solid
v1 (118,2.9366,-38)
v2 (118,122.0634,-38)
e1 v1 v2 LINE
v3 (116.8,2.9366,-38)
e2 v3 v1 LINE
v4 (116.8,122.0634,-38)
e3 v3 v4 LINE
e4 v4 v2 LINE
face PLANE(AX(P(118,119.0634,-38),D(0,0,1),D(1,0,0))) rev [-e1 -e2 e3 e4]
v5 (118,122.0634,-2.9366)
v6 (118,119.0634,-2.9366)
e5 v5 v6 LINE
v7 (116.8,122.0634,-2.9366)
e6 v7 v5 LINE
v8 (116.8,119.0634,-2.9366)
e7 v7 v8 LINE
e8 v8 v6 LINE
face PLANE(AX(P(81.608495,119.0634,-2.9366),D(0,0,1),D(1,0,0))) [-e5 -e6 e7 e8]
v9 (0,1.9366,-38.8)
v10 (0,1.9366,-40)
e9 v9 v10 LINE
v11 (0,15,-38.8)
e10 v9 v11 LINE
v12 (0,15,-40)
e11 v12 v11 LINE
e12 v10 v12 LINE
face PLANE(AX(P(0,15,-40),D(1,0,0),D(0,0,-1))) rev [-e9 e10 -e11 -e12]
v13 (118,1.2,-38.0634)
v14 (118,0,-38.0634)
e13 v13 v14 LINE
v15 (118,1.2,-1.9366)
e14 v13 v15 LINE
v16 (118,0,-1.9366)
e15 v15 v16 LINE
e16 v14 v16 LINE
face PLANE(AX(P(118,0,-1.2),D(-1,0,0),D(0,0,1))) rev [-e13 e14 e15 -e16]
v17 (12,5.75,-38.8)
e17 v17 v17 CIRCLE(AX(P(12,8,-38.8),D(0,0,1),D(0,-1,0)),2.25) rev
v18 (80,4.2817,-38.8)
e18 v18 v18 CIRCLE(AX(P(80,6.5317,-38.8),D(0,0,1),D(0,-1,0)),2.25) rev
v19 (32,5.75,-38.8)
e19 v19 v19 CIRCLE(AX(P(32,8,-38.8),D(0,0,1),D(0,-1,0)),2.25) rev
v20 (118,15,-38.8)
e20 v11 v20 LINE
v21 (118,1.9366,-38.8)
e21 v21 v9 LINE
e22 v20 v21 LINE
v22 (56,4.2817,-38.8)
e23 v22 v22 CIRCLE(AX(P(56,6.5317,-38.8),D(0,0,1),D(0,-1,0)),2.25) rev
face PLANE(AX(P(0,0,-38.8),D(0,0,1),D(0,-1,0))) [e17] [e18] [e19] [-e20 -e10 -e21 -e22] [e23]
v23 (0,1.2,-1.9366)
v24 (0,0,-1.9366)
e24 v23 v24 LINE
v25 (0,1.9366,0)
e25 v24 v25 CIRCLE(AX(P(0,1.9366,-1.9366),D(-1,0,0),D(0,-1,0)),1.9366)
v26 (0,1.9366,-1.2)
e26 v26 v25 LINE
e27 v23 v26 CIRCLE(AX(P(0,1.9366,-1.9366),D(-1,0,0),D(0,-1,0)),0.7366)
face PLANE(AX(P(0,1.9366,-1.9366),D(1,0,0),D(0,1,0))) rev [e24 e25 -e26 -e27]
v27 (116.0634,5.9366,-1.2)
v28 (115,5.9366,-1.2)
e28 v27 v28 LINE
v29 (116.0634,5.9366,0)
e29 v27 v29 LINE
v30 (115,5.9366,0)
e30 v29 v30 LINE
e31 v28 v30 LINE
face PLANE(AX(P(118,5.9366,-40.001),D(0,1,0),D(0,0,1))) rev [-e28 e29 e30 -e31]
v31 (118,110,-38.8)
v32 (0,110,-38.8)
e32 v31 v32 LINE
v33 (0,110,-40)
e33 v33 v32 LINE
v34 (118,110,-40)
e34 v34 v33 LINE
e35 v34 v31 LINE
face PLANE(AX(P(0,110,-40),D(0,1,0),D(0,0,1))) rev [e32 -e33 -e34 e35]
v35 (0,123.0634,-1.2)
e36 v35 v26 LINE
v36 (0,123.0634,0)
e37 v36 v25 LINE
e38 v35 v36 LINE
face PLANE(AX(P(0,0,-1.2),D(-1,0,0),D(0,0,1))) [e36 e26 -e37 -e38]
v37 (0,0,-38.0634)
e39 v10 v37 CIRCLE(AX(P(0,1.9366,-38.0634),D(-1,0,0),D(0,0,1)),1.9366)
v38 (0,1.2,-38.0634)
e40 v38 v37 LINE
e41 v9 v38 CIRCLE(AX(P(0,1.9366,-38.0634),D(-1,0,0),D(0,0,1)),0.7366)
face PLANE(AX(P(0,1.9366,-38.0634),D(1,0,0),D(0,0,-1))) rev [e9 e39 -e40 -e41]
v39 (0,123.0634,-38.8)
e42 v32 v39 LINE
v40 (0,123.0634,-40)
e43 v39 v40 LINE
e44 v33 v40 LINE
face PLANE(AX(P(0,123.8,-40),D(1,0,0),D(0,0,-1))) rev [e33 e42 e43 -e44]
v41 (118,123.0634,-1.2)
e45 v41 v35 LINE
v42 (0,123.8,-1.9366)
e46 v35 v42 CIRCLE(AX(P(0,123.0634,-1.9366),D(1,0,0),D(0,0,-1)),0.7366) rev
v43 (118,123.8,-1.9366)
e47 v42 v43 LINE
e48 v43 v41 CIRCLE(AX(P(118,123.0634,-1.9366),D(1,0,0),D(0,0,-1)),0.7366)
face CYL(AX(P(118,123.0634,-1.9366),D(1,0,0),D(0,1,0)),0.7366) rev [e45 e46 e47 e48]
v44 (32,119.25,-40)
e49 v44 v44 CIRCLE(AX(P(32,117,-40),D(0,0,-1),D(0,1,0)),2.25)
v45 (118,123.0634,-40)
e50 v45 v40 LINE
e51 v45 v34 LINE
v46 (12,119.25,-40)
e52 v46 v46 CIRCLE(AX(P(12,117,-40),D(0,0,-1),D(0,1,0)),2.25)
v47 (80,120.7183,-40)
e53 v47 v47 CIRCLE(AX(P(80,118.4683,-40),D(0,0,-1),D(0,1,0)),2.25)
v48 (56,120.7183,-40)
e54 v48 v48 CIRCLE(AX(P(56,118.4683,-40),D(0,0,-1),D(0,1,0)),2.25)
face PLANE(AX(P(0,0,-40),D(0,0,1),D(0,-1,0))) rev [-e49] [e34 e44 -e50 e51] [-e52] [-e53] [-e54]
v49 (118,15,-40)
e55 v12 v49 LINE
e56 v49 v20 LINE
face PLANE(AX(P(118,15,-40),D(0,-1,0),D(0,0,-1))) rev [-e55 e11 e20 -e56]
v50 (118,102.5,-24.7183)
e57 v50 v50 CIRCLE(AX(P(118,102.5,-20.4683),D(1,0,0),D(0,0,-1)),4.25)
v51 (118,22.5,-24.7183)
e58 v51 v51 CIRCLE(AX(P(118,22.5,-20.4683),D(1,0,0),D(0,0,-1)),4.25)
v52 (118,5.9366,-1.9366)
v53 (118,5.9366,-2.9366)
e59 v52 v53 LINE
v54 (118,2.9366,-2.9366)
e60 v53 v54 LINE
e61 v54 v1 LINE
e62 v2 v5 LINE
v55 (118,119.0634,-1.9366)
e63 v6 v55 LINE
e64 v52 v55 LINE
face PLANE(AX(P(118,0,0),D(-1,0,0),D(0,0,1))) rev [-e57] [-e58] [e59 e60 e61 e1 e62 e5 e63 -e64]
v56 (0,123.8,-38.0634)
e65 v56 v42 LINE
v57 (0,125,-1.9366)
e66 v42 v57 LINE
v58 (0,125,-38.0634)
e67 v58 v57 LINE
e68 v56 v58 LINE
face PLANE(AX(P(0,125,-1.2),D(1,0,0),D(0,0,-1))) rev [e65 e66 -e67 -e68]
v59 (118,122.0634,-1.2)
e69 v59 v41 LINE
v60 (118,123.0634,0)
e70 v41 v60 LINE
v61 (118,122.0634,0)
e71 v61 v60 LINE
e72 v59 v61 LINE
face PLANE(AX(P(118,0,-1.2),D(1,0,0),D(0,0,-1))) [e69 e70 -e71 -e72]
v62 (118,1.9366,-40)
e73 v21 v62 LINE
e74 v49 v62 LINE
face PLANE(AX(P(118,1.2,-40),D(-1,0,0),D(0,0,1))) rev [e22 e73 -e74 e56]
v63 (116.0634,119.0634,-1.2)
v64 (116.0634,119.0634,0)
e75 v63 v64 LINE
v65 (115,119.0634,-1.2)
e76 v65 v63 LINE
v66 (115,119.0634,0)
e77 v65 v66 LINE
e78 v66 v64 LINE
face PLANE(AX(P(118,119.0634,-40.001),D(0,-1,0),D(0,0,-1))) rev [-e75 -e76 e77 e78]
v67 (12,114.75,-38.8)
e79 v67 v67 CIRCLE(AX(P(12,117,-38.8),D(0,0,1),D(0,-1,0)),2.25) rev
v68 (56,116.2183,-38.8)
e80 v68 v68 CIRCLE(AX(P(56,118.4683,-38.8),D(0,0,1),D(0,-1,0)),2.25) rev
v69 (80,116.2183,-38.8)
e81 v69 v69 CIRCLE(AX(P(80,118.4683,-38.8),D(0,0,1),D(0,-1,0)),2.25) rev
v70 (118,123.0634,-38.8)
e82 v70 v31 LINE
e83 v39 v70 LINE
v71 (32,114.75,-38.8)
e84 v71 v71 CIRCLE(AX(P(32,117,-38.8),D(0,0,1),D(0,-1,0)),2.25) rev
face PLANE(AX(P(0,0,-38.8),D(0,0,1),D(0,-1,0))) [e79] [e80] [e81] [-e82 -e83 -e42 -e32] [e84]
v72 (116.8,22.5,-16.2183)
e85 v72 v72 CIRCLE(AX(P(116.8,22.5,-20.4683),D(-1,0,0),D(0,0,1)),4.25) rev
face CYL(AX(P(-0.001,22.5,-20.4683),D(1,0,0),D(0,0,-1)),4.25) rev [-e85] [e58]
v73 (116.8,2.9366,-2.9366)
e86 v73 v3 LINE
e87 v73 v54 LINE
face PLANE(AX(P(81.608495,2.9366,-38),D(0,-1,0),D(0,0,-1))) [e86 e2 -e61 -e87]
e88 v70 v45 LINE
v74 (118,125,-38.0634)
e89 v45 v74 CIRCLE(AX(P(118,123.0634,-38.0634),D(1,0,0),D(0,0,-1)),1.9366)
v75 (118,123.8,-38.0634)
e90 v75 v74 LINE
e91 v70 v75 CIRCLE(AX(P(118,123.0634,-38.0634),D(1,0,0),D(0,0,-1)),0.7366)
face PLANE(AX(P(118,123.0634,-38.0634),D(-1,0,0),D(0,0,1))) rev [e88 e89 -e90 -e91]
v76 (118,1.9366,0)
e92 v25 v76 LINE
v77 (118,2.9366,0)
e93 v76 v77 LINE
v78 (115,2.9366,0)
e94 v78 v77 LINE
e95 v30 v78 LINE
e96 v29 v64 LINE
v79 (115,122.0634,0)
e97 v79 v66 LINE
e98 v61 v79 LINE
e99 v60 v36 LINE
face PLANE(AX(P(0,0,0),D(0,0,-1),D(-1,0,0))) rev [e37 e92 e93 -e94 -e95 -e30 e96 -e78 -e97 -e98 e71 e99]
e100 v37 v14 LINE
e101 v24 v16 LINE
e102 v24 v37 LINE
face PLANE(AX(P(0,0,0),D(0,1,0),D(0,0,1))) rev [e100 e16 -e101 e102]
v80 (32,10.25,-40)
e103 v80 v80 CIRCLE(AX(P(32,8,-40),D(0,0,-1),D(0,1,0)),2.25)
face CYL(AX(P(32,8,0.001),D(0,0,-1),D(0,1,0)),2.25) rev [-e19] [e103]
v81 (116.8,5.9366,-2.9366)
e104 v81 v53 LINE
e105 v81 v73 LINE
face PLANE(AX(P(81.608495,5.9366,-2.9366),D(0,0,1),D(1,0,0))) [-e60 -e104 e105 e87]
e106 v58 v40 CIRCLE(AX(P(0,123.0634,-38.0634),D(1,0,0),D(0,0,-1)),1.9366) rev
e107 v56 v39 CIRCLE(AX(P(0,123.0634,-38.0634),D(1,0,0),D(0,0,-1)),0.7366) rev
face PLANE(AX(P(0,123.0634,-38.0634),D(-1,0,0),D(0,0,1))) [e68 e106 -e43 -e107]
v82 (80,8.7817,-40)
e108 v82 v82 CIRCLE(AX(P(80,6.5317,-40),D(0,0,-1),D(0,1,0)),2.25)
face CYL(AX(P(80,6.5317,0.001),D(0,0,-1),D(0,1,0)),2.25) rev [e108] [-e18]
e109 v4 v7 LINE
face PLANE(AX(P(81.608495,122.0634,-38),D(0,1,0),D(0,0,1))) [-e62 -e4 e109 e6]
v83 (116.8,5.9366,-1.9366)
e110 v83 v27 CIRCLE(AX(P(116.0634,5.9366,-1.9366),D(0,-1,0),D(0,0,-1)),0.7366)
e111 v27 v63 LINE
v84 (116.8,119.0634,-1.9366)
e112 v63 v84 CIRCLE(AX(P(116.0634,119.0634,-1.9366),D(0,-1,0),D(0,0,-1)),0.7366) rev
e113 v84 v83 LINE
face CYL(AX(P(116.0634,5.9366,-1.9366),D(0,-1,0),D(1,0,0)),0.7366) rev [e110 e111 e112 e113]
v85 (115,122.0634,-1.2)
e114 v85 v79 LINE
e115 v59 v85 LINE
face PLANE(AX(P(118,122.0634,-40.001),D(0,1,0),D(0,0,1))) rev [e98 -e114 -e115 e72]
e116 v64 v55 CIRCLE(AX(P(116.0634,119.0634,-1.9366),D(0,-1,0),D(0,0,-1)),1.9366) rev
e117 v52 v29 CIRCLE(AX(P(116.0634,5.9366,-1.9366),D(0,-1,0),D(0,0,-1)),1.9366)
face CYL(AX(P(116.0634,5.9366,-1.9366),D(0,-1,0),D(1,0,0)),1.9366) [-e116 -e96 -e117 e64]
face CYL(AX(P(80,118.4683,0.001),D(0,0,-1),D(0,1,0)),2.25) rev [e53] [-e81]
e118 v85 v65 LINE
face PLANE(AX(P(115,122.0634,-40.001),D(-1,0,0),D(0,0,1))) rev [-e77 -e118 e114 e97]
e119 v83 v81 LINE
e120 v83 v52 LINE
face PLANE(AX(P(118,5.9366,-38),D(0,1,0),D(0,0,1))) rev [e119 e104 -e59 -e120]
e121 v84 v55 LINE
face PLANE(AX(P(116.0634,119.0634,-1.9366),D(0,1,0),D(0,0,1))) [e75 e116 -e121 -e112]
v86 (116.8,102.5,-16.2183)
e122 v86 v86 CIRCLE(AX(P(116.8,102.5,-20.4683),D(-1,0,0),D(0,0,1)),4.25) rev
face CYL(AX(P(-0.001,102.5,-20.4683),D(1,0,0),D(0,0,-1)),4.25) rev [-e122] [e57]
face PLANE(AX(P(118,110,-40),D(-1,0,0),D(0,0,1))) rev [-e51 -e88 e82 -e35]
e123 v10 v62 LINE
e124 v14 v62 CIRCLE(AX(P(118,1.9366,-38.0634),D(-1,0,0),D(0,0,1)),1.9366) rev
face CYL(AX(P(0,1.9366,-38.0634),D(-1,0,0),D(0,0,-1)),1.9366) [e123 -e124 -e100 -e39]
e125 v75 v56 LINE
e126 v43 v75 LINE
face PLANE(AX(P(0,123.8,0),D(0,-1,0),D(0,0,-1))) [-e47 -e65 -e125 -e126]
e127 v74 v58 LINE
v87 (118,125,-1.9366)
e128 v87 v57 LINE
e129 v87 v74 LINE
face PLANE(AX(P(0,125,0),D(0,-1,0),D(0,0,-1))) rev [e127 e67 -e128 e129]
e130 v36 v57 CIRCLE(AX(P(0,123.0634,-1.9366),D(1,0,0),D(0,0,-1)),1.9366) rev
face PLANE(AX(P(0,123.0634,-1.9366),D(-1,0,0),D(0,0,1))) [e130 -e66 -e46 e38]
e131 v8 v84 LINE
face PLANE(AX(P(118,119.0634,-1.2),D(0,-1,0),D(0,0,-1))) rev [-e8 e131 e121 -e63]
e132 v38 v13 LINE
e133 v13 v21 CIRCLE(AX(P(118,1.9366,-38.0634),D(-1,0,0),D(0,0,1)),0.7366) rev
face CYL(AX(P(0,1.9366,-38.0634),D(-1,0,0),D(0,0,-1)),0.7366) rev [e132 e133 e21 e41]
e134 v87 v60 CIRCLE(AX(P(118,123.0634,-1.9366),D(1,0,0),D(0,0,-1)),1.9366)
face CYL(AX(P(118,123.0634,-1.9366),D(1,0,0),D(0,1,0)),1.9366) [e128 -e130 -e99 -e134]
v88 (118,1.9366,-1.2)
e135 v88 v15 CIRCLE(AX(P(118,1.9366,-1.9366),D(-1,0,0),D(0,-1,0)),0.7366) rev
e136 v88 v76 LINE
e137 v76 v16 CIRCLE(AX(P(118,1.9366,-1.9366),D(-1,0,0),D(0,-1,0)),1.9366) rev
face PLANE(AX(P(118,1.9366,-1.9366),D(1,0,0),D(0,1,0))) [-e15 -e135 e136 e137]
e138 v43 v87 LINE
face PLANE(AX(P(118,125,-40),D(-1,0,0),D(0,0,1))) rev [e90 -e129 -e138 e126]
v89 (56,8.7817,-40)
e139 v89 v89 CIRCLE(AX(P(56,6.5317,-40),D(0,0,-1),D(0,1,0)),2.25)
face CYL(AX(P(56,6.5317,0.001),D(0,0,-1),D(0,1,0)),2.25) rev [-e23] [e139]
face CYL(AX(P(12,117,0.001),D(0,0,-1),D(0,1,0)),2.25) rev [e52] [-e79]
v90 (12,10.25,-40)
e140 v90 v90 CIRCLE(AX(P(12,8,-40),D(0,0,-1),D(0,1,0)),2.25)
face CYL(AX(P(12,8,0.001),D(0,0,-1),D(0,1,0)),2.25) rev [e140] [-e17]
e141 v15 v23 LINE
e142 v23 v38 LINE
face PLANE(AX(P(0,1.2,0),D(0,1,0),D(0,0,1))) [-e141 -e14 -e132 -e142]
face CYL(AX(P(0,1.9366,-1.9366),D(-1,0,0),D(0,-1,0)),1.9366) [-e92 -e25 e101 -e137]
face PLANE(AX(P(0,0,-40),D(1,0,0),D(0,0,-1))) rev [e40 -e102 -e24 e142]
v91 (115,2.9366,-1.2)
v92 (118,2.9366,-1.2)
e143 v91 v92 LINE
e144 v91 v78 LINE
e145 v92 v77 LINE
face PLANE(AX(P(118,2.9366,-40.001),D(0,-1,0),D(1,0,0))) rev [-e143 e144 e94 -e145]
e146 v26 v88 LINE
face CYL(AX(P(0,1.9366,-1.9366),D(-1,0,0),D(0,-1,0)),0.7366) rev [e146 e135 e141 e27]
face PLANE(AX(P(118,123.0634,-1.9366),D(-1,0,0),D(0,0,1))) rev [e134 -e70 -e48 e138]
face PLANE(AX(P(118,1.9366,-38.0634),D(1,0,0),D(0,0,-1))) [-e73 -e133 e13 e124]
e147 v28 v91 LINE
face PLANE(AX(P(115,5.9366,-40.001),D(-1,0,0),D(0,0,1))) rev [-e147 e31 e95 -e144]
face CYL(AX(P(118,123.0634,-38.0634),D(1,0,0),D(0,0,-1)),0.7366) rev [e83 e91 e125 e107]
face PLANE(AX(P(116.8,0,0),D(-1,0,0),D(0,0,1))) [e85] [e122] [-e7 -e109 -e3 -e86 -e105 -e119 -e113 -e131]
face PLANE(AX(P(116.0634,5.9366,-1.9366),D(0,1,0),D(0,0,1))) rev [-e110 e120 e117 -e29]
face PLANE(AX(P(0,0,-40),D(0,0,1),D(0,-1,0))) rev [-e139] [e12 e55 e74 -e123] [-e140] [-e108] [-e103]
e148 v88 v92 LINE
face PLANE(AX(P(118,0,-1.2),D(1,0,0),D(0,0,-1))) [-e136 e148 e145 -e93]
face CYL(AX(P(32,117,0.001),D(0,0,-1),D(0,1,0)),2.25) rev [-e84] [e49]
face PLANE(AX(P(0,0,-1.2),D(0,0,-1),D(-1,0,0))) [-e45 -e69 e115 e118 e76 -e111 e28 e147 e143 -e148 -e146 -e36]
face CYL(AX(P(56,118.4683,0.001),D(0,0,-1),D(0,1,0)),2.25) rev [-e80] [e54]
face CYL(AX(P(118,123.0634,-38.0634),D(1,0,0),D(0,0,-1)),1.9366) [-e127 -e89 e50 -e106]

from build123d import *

# Parameters (mm, degrees)
SKETCH_1_W                       = 118
SKETCH_1_H                       = 125
SM_BASE_FLANGE_1_DEPTH           = 1.2
SM_EDGE_FLANGE_2_STRIP_W         = 6.2732
SM_EDGE_FLANGE_2_STRIP_H         = 1.2
SM_EDGE_FLANGE_2_STRIP_CUT_DEPTH = 118
SM_EDGE_FLANGE_2_DEPTH           = 118
SM_EDGE_FLANGE_3_STRIP_W         = 6.2732
SM_EDGE_FLANGE_3_STRIP_H         = 1.2
SM_EDGE_FLANGE_3_STRIP_CUT_DEPTH = 118
SM_EDGE_FLANGE_3_DEPTH           = 118
SM_EDGE_FLANGE_4_STRIP_W         = 6.2732
SM_EDGE_FLANGE_4_STRIP_H         = 1.2
SM_EDGE_FLANGE_4_STRIP_CUT_DEPTH = 118
SM_EDGE_FLANGE_4_DEPTH           = 118
SM_EDGE_FLANGE_5_STRIP_W         = 6.2732
SM_EDGE_FLANGE_5_STRIP_H         = 1.2
SM_EDGE_FLANGE_5_STRIP_CUT_DEPTH = 118
SM_EDGE_FLANGE_5_DEPTH           = 118
CUT_EXTRUDE_2_REACH              = 178.491
SKETCH_22_W                      = 3
SKETCH_22_H                      = 3
SM_EDGE_FLANGE_6_STRIP_W         = 6.2732
SM_EDGE_FLANGE_6_STRIP_H         = 1.2
SM_EDGE_FLANGE_6_STRIP_CUT_DEPTH = 113.1268
SM_EDGE_FLANGE_6_DEPTH           = 113.1268
SKETCH_26_W                      = 35.0634
SKETCH_26_H                      = 3
EXTRUDE_1_DEPTH                  = 1.2
CUT_EXTRUDE_3_REACH              = 178.491
SKETCH_27_R                      = 4.25
CUT_EXTRUDE_4_REACH              = 178.491
SKETCH_28_R                      = 2.25
CUT_EXTRUDE_5_REACH              = 178.491
SKETCH_29_R                      = 2.25


# Sheet-metal steps are written as plain solids
with BuildPart() as part:
    # Sketch 1 → Базовая кромка1 (new body)
    with BuildSketch(Plane.XY):
        with Locations((59, 62.5)):
            Rectangle(SKETCH_1_W, SKETCH_1_H)
    extrude(amount=-SM_BASE_FLANGE_1_DEPTH)

    # Ребро-кромка2 strip (across the edge) → Ребро-кромка2 strip cut (cut)
    with BuildSketch(Plane(origin=(118, 0, -1.2), x_dir=(0, 1, 0), z_dir=(-1, 0, 0))):
        with Locations((-1.2, -0.6)):
            Rectangle(SM_EDGE_FLANGE_2_STRIP_W, SM_EDGE_FLANGE_2_STRIP_H)
    extrude(amount=SM_EDGE_FLANGE_2_STRIP_CUT_DEPTH, mode=Mode.SUBTRACT)

    # Ребро-кромка2 section (across the edge) → Ребро-кромка2 (add)
    with BuildSketch(Plane(origin=(118, 0, -1.2), x_dir=(0, 1, 0), z_dir=(-1, 0, 0))):
        with BuildLine():
            Line((0, 0.7366), (0, 38.8))
            Line((0, 38.8), (1.2, 38.8))
            Line((1.2, 38.8), (1.2, 0.7366))
            ThreePointArc((1.2, 0.7366), (1.415745145, 0.215745145), (1.9366, 0))
            Line((1.9366, 0), (1.9366, -1.2))
            ThreePointArc((1.9366, -1.2), (0.567217008, -0.632782992), (0, 0.7366))
        make_face()
    extrude(amount=SM_EDGE_FLANGE_2_DEPTH)

    # Ребро-кромка3 strip (across the edge) → Ребро-кромка3 strip cut (cut)
    with BuildSketch(Plane(origin=(0, 125, -1.2), x_dir=(0, -1, 0), z_dir=(1, 0, 0))):
        with Locations((-1.2, -0.6)):
            Rectangle(SM_EDGE_FLANGE_3_STRIP_W, SM_EDGE_FLANGE_3_STRIP_H)
    extrude(amount=SM_EDGE_FLANGE_3_STRIP_CUT_DEPTH, mode=Mode.SUBTRACT)

    # Ребро-кромка3 section (across the edge) → Ребро-кромка3 (add)
    with BuildSketch(Plane(origin=(0, 125, -1.2), x_dir=(0, -1, 0), z_dir=(1, 0, 0))):
        with BuildLine():
            Line((0, 0.7366), (0, 38.8))
            Line((0, 38.8), (1.2, 38.8))
            Line((1.2, 38.8), (1.2, 0.7366))
            ThreePointArc((1.2, 0.7366), (1.415745145, 0.215745145), (1.9366, 0))
            Line((1.9366, 0), (1.9366, -1.2))
            ThreePointArc((1.9366, -1.2), (0.567217008, -0.632782992), (0, 0.7366))
        make_face()
    extrude(amount=SM_EDGE_FLANGE_3_DEPTH)

    # Ребро-кромка4 strip (across the edge) → Ребро-кромка4 strip cut (cut)
    with BuildSketch(Plane(origin=(0, 123.8, -40), x_dir=(0, 0, 1), z_dir=(1, 0, 0))):
        with Locations((-1.2, -0.6)):
            Rectangle(SM_EDGE_FLANGE_4_STRIP_W, SM_EDGE_FLANGE_4_STRIP_H)
    extrude(amount=SM_EDGE_FLANGE_4_STRIP_CUT_DEPTH, mode=Mode.SUBTRACT)

    # Ребро-кромка4 section (across the edge) → Ребро-кромка4 (add)
    with BuildSketch(Plane(origin=(0, 123.8, -40), x_dir=(0, 0, 1), z_dir=(1, 0, 0))):
        with BuildLine():
            Line((0, 0.7366), (0, 13.8))
            Line((0, 13.8), (1.2, 13.8))
            Line((1.2, 13.8), (1.2, 0.7366))
            ThreePointArc((1.2, 0.7366), (1.415745145, 0.215745145), (1.9366, 0))
            Line((1.9366, 0), (1.9366, -1.2))
            ThreePointArc((1.9366, -1.2), (0.567217008, -0.632782992), (0, 0.7366))
        make_face()
    extrude(amount=SM_EDGE_FLANGE_4_DEPTH)

    # Ребро-кромка5 strip (across the edge) → Ребро-кромка5 strip cut (cut)
    with BuildSketch(Plane(origin=(118, 1.2, -40), x_dir=(0, 0, 1), z_dir=(-1, 0, 0))):
        with Locations((-1.2, -0.6)):
            Rectangle(SM_EDGE_FLANGE_5_STRIP_W, SM_EDGE_FLANGE_5_STRIP_H)
    extrude(amount=SM_EDGE_FLANGE_5_STRIP_CUT_DEPTH, mode=Mode.SUBTRACT)

    # Ребро-кромка5 section (across the edge) → Ребро-кромка5 (add)
    with BuildSketch(Plane(origin=(118, 1.2, -40), x_dir=(0, 0, 1), z_dir=(-1, 0, 0))):
        with BuildLine():
            Line((0, 0.7366), (0, 13.8))
            Line((0, 13.8), (1.2, 13.8))
            Line((1.2, 13.8), (1.2, 0.7366))
            ThreePointArc((1.2, 0.7366), (1.415745145, 0.215745145), (1.9366, 0))
            Line((1.9366, 0), (1.9366, -1.2))
            ThreePointArc((1.9366, -1.2), (0.567217008, -0.632782992), (0, 0.7366))
        make_face()
    extrude(amount=SM_EDGE_FLANGE_5_DEPTH)

    # Эскиз22 → Вырез-Вытянуть2 (cut, up to next)
    with BuildSketch(Plane.XY, mode=Mode.PRIVATE) as cut_extrude_2_sk1:
        with Locations((116.5, 120.5634)):
            Rectangle(SKETCH_22_W, SKETCH_22_H)
    cut_extrude_2_tool1 = extrude(cut_extrude_2_sk1.sketch, amount=-CUT_EXTRUDE_2_REACH, mode=Mode.PRIVATE) & part.part
    # Эскиз22 → Вырез-Вытянуть2 (cut, up to next)
    with BuildSketch(Plane.XY, mode=Mode.PRIVATE) as cut_extrude_2_sk2:
        with Locations((116.5, 4.4366)):
            Rectangle(SKETCH_22_W, SKETCH_22_H)
    cut_extrude_2_tool2 = extrude(cut_extrude_2_sk2.sketch, amount=-CUT_EXTRUDE_2_REACH, mode=Mode.PRIVATE) & part.part
    add(cut_extrude_2_tool1.solids().sort_by_distance((116.5, 120.5634, 0))[0], mode=Mode.SUBTRACT)
    add(cut_extrude_2_tool2.solids().sort_by_distance((116.5, 4.4366, 0))[0], mode=Mode.SUBTRACT)

    # Ребро-кромка6 strip (across the edge) → Ребро-кромка6 strip cut (cut)
    with BuildSketch(Plane(origin=(118, 119.0634, -1.2), x_dir=(-1, 0, 0), z_dir=(0, -1, 0))):
        with Locations((-1.2, -0.6)):
            Rectangle(SM_EDGE_FLANGE_6_STRIP_W, SM_EDGE_FLANGE_6_STRIP_H)
    extrude(amount=SM_EDGE_FLANGE_6_STRIP_CUT_DEPTH, mode=Mode.SUBTRACT)

    # Ребро-кромка6 section (across the edge) → Ребро-кромка6 (add)
    with BuildSketch(Plane(origin=(118, 119.0634, -1.2), x_dir=(-1, 0, 0), z_dir=(0, -1, 0))):
        with BuildLine():
            Line((0, 0.7366), (0, 36.8))
            Line((0, 36.8), (1.2, 36.8))
            Line((1.2, 36.8), (1.2, 0.7366))
            ThreePointArc((1.2, 0.7366), (1.415745145, 0.215745145), (1.9366, 0))
            Line((1.9366, 0), (1.9366, -1.2))
            ThreePointArc((1.9366, -1.2), (0.567217008, -0.632782992), (0, 0.7366))
        make_face()
    extrude(amount=SM_EDGE_FLANGE_6_DEPTH)

    # Эскиз26 → Бобышка-Вытянуть1 (add)
    with BuildSketch(Plane(origin=(118, 0, 0), x_dir=(0, 0, -1), z_dir=(1, 0, 0))):
        with Locations((20.4683, 120.5634)):
            Rectangle(SKETCH_26_W, SKETCH_26_H)
        with Locations((20.4683, 4.4366)):
            Rectangle(SKETCH_26_W, SKETCH_26_H)
    extrude(amount=-EXTRUDE_1_DEPTH)

    # Эскиз27 → Вырез-Вытянуть3 (cut, up to next)
    with BuildSketch(Plane(origin=(118, 0, 0), x_dir=(0, 0, -1), z_dir=(1, 0, 0)), mode=Mode.PRIVATE) as cut_extrude_3_sk1:
        with Locations((20.4683, 102.5)):
            Circle(SKETCH_27_R)
    cut_extrude_3_tool1 = extrude(cut_extrude_3_sk1.sketch, amount=-CUT_EXTRUDE_3_REACH, mode=Mode.PRIVATE) & part.part
    # Эскиз27 → Вырез-Вытянуть3 (cut, up to next)
    with BuildSketch(Plane(origin=(118, 0, 0), x_dir=(0, 0, -1), z_dir=(1, 0, 0)), mode=Mode.PRIVATE) as cut_extrude_3_sk2:
        with Locations((20.4683, 22.5)):
            Circle(SKETCH_27_R)
    cut_extrude_3_tool2 = extrude(cut_extrude_3_sk2.sketch, amount=-CUT_EXTRUDE_3_REACH, mode=Mode.PRIVATE) & part.part
    add(cut_extrude_3_tool1.solids().sort_by_distance((118, 102.5, -20.4683))[0], mode=Mode.SUBTRACT)
    add(cut_extrude_3_tool2.solids().sort_by_distance((118, 22.5, -20.4683))[0], mode=Mode.SUBTRACT)

    # Эскиз28 → Вырез-Вытянуть4 (cut, up to next)
    with BuildSketch(Plane(origin=(0, 0, -40), x_dir=(-1, 0, 0), z_dir=(0, 0, -1)), mode=Mode.PRIVATE) as cut_extrude_4_sk1:
        with Locations(Location((-80, 118.4683, 0), (0, 0, 90))):
            Circle(SKETCH_28_R)
    cut_extrude_4_tool1 = extrude(cut_extrude_4_sk1.sketch, amount=-CUT_EXTRUDE_4_REACH, mode=Mode.PRIVATE) & part.part
    # Эскиз28 → Вырез-Вытянуть4 (cut, up to next)
    with BuildSketch(Plane(origin=(0, 0, -40), x_dir=(-1, 0, 0), z_dir=(0, 0, -1)), mode=Mode.PRIVATE) as cut_extrude_4_sk2:
        with Locations(Location((-56, 118.4683, 0), (0, 0, 90))):
            Circle(SKETCH_28_R)
    cut_extrude_4_tool2 = extrude(cut_extrude_4_sk2.sketch, amount=-CUT_EXTRUDE_4_REACH, mode=Mode.PRIVATE) & part.part
    # Эскиз28 → Вырез-Вытянуть4 (cut, up to next)
    with BuildSketch(Plane(origin=(0, 0, -40), x_dir=(-1, 0, 0), z_dir=(0, 0, -1)), mode=Mode.PRIVATE) as cut_extrude_4_sk3:
        with Locations(Location((-80, 6.5317, 0), (0, 0, 90))):
            Circle(SKETCH_28_R)
    cut_extrude_4_tool3 = extrude(cut_extrude_4_sk3.sketch, amount=-CUT_EXTRUDE_4_REACH, mode=Mode.PRIVATE) & part.part
    # Эскиз28 → Вырез-Вытянуть4 (cut, up to next)
    with BuildSketch(Plane(origin=(0, 0, -40), x_dir=(-1, 0, 0), z_dir=(0, 0, -1)), mode=Mode.PRIVATE) as cut_extrude_4_sk4:
        with Locations(Location((-56, 6.5317, 0), (0, 0, 90))):
            Circle(SKETCH_28_R)
    cut_extrude_4_tool4 = extrude(cut_extrude_4_sk4.sketch, amount=-CUT_EXTRUDE_4_REACH, mode=Mode.PRIVATE) & part.part
    add(cut_extrude_4_tool1.solids().sort_by_distance((80, 118.4683, -40))[0], mode=Mode.SUBTRACT)
    add(cut_extrude_4_tool2.solids().sort_by_distance((56, 118.4683, -40))[0], mode=Mode.SUBTRACT)
    add(cut_extrude_4_tool3.solids().sort_by_distance((80, 6.5317, -40))[0], mode=Mode.SUBTRACT)
    add(cut_extrude_4_tool4.solids().sort_by_distance((56, 6.5317, -40))[0], mode=Mode.SUBTRACT)

    # Эскиз29 → Вырез-Вытянуть5 (cut, up to next)
    with BuildSketch(Plane(origin=(0, 0, -40), x_dir=(-1, 0, 0), z_dir=(0, 0, -1)), mode=Mode.PRIVATE) as cut_extrude_5_sk1:
        with Locations(Location((-32, 117, 0), (0, 0, 90))):
            Circle(SKETCH_29_R)
    cut_extrude_5_tool1 = extrude(cut_extrude_5_sk1.sketch, amount=-CUT_EXTRUDE_5_REACH, mode=Mode.PRIVATE) & part.part
    # Эскиз29 → Вырез-Вытянуть5 (cut, up to next)
    with BuildSketch(Plane(origin=(0, 0, -40), x_dir=(-1, 0, 0), z_dir=(0, 0, -1)), mode=Mode.PRIVATE) as cut_extrude_5_sk2:
        with Locations(Location((-12, 117, 0), (0, 0, 90))):
            Circle(SKETCH_29_R)
    cut_extrude_5_tool2 = extrude(cut_extrude_5_sk2.sketch, amount=-CUT_EXTRUDE_5_REACH, mode=Mode.PRIVATE) & part.part
    # Эскиз29 → Вырез-Вытянуть5 (cut, up to next)
    with BuildSketch(Plane(origin=(0, 0, -40), x_dir=(-1, 0, 0), z_dir=(0, 0, -1)), mode=Mode.PRIVATE) as cut_extrude_5_sk3:
        with Locations(Location((-32, 8, 0), (0, 0, 90))):
            Circle(SKETCH_29_R)
    cut_extrude_5_tool3 = extrude(cut_extrude_5_sk3.sketch, amount=-CUT_EXTRUDE_5_REACH, mode=Mode.PRIVATE) & part.part
    # Эскиз29 → Вырез-Вытянуть5 (cut, up to next)
    with BuildSketch(Plane(origin=(0, 0, -40), x_dir=(-1, 0, 0), z_dir=(0, 0, -1)), mode=Mode.PRIVATE) as cut_extrude_5_sk4:
        with Locations(Location((-12, 8, 0), (0, 0, 90))):
            Circle(SKETCH_29_R)
    cut_extrude_5_tool4 = extrude(cut_extrude_5_sk4.sketch, amount=-CUT_EXTRUDE_5_REACH, mode=Mode.PRIVATE) & part.part
    add(cut_extrude_5_tool1.solids().sort_by_distance((32, 117, -40))[0], mode=Mode.SUBTRACT)
    add(cut_extrude_5_tool2.solids().sort_by_distance((12, 117, -40))[0], mode=Mode.SUBTRACT)
    add(cut_extrude_5_tool3.solids().sort_by_distance((32, 8, -40))[0], mode=Mode.SUBTRACT)
    add(cut_extrude_5_tool4.solids().sort_by_distance((12, 8, -40))[0], mode=Mode.SUBTRACT)


solid = part.part
